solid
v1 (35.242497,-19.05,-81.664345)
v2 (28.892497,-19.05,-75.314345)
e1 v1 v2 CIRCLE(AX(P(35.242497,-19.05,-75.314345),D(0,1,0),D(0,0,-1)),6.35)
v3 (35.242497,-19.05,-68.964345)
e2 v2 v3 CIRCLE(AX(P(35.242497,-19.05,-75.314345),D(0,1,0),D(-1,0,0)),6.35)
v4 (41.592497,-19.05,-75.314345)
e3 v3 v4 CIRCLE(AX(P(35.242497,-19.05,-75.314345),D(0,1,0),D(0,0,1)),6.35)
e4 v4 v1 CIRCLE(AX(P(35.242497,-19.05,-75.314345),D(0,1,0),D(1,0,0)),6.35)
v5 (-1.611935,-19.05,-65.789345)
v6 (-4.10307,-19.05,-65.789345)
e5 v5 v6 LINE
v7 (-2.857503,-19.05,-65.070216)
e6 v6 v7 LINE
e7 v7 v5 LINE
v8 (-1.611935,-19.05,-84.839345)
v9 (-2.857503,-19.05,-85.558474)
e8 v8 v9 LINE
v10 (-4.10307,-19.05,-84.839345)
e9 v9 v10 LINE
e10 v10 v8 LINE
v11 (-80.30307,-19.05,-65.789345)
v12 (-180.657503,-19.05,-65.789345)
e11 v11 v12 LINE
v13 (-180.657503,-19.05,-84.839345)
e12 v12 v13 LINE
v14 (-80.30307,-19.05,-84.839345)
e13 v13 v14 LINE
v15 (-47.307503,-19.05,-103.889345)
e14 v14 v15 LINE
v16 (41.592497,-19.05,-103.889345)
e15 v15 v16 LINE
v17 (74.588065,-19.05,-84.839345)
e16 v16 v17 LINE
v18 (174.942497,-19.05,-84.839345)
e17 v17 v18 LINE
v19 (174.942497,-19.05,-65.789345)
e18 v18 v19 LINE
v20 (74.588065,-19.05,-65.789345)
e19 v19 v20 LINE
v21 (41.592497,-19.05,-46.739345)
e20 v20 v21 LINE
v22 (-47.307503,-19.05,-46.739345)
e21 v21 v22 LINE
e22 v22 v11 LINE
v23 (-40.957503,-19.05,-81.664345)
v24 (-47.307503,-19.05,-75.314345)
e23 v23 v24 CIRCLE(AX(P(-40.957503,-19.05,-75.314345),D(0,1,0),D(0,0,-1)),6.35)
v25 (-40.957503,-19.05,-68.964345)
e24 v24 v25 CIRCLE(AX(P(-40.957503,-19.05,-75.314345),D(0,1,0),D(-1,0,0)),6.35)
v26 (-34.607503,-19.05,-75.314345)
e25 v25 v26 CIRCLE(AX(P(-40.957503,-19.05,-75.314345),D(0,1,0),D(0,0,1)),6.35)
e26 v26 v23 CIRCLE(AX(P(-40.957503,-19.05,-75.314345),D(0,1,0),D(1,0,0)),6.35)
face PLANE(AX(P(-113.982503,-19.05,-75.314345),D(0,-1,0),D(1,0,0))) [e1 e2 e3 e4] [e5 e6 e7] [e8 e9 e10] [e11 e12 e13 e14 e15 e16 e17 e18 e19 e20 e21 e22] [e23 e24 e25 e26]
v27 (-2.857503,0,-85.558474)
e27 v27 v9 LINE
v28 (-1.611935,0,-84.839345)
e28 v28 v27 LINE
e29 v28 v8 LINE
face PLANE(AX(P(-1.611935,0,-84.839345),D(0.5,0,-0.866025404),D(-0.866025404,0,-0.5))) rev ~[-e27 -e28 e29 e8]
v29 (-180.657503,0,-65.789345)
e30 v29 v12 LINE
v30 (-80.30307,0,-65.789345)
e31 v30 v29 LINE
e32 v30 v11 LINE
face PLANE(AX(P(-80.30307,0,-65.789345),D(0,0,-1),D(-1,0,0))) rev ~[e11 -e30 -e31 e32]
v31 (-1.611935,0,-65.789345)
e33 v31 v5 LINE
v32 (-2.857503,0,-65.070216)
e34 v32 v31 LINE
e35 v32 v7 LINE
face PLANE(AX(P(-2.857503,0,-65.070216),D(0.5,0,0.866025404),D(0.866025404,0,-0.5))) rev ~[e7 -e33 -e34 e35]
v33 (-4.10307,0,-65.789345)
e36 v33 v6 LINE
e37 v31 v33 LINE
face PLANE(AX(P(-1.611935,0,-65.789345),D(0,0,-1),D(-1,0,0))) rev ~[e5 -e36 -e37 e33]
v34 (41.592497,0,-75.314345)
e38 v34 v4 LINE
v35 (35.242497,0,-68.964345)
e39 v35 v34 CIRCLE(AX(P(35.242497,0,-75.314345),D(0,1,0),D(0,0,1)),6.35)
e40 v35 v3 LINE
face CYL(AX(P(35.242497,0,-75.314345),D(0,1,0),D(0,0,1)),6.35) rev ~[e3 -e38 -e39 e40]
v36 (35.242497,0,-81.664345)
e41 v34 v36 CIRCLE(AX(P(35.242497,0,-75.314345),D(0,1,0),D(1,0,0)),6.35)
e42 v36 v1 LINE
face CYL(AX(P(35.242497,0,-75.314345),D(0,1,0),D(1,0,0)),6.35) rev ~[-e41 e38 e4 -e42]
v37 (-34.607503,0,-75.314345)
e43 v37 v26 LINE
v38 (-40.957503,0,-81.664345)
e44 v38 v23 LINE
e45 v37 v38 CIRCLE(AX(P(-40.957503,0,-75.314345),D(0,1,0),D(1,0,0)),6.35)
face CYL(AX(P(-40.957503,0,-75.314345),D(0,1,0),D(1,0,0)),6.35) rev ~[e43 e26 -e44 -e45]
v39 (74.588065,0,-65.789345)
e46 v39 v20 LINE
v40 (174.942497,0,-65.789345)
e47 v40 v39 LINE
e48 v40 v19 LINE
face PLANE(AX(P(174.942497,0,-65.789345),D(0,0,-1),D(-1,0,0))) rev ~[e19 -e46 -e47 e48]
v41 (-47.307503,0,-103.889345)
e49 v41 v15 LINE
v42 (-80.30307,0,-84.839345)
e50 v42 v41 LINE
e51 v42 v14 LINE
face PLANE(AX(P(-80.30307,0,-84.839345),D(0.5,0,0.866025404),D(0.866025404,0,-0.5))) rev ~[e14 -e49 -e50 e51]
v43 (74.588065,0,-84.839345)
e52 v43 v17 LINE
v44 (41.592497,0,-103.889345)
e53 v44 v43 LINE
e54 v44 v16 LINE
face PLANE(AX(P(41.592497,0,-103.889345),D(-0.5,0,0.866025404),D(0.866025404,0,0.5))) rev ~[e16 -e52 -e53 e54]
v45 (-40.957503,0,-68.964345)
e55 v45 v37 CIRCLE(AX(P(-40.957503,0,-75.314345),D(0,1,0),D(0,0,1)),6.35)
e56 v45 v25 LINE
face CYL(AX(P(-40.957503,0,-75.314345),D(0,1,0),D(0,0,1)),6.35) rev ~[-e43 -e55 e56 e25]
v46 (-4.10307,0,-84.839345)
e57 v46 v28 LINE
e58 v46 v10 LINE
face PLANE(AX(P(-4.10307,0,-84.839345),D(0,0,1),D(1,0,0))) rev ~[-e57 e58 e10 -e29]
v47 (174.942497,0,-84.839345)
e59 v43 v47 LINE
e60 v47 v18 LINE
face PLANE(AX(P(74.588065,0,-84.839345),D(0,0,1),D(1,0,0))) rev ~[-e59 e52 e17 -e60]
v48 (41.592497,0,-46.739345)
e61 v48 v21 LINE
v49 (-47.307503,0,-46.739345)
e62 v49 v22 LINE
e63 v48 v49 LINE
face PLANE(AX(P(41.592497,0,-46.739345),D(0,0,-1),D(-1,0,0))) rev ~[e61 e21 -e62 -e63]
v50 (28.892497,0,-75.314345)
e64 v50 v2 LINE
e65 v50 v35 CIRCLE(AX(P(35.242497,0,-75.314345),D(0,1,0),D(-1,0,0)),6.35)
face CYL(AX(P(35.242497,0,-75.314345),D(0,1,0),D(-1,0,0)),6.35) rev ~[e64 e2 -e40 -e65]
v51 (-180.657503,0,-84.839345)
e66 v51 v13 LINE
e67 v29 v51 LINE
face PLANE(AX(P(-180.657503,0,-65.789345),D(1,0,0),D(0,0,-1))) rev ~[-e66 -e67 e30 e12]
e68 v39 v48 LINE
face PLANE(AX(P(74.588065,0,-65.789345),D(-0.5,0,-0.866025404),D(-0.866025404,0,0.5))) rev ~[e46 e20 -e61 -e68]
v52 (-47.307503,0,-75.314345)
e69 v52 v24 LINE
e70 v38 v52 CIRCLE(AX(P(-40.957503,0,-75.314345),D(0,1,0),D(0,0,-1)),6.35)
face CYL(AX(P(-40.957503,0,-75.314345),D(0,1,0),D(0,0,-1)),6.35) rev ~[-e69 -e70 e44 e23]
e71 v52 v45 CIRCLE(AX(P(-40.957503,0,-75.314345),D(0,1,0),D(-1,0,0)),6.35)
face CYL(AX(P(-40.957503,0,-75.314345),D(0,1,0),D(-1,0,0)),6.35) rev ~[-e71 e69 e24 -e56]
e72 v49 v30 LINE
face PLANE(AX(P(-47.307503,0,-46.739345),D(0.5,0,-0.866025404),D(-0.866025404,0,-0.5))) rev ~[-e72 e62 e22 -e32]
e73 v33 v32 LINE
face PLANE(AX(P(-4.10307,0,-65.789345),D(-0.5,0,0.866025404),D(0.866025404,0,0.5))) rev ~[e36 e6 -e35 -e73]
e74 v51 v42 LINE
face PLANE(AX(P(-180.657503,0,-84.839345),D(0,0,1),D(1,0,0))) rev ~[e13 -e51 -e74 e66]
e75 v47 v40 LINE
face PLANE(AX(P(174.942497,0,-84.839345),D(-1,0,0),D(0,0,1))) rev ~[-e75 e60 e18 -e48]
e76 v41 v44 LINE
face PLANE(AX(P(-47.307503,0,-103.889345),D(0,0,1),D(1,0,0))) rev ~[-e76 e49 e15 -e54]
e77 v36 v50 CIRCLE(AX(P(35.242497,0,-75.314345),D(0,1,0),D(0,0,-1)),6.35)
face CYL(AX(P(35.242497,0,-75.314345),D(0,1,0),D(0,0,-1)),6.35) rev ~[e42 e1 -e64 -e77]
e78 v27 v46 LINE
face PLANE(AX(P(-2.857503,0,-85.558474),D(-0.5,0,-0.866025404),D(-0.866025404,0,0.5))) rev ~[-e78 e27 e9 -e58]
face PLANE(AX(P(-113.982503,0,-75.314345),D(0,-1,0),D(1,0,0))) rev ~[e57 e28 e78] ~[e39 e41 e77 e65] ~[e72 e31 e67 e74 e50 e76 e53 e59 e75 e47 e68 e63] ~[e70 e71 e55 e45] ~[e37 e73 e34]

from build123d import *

# Parameters (mm, degrees)
F1_DEPTH = 19.05


with BuildPart() as f1:
    # F0 (on Front) → F1 (new body)
    with BuildSketch(Plane.XZ):
        Polygon((-80.3030704341, -65.7893445744), (-180.6575025499, -65.7893445744), (-180.6575025499, -84.8393445744), (-80.3030704341, -84.8393445744), (-47.3075025499, -84.8393445744), (-47.3075025499, -75.3143445744), (-47.3075025499, -65.7893445744), align=None)
        Polygon((-47.3075025499, -46.7393445744), (-80.3030704341, -65.7893445744), (-47.3075025499, -65.7893445744), align=None)
        Polygon((-47.3075025499, -46.7393445744), (-47.3075025499, -65.7893445744), (-40.9575025499, -65.7893445744), (-34.6075025499, -65.7893445744), (-34.6075025499, -46.7393445744), align=None)
        with BuildLine():
            Line((-40.9575025499, -65.7893445744), (-47.3075025499, -65.7893445744))
            Line((-47.3075025499, -65.7893445744), (-47.3075025499, -75.3143445744))
            ThreePointArc((-47.3075025499, -75.3143445744), (-45.4476306104, -70.8242165139), (-40.9575025499, -68.9643445744))
            Line((-40.9575025499, -68.9643445744), (-40.9575025499, -65.7893445744))
        make_face()
        Polygon((-47.3075025499, -84.8393445744), (-80.3030704341, -84.8393445744), (-47.3075025499, -103.8893445744), align=None)
        with BuildLine():
            Line((-34.6075025499, -65.7893445744), (-40.9575025499, -65.7893445744))
            Line((-40.9575025499, -65.7893445744), (-40.9575025499, -68.9643445744))
            ThreePointArc((-40.9575025499, -68.9643445744), (-36.4673744894, -70.8242165139), (-34.6075025499, -75.3143445744))
            Line((-34.6075025499, -75.3143445744), (-34.6075025499, -65.7893445744))
        make_face()
        with BuildLine():
            ThreePointArc((-40.9575025499, -81.6643445744), (-45.4476306104, -79.8044726349), (-47.3075025499, -75.3143445744))
            Line((-47.3075025499, -75.3143445744), (-47.3075025499, -84.8393445744))
            Line((-47.3075025499, -84.8393445744), (-43.3831779935, -84.8393445744))
            Line((-43.3831779935, -84.8393445744), (-40.9575025499, -84.8393445744))
            Line((-40.9575025499, -84.8393445744), (-40.9575025499, -81.6643445744))
        make_face()
        Polygon((-2.8575025499, -65.0702156212), (-34.6075025499, -46.7393445744), (-34.6075025499, -65.7893445744), (-4.1030704341, -65.7893445744), align=None)
        Polygon((28.8924974501, -46.7393445744), (-34.6075025499, -46.7393445744), (-2.8575025499, -65.0702156212), align=None)
        Polygon((-43.3831779935, -84.8393445744), (-47.3075025499, -84.8393445744), (-47.3075025499, -103.8893445744), (-34.6075025499, -103.8893445744), (-34.6075025499, -84.8393445744), (-40.9575025499, -84.8393445744), align=None)
        Polygon((-4.1030704341, -65.7893445744), (-34.6075025499, -65.7893445744), (-34.6075025499, -75.3143445744), (-34.6075025499, -84.8393445744), (-4.1030704341, -84.8393445744), (-2.8575025499, -84.8393445744), (-2.8575025499, -65.7893445744), align=None)
        with BuildLine():
            ThreePointArc((-34.6075025499, -75.3143445744), (-36.4673744894, -79.8044726349), (-40.9575025499, -81.6643445744))
            Line((-40.9575025499, -81.6643445744), (-40.9575025499, -84.8393445744))
            Line((-40.9575025499, -84.8393445744), (-34.6075025499, -84.8393445744))
            Line((-34.6075025499, -84.8393445744), (-34.6075025499, -75.3143445744))
        make_face()
        Polygon((28.8924974501, -46.7393445744), (-2.8575025499, -65.0702156212), (-1.6119346657, -65.7893445744), (28.8924974501, -65.7893445744), align=None)
        Polygon((41.5924974501, -46.7393445744), (28.8924974501, -46.7393445744), (28.8924974501, -65.7893445744), (35.2424974501, -65.7893445744), (41.5924974501, -65.7893445744), align=None)
        Polygon((-34.6075025499, -84.8393445744), (-34.6075025499, -103.8893445744), (-2.8575025499, -85.5584735276), (-4.1030704341, -84.8393445744), align=None)
        Polygon((-2.8575025499, -85.5584735276), (-34.6075025499, -103.8893445744), (28.8924974501, -103.8893445744), align=None)
        Polygon((28.8924974501, -65.7893445744), (-1.6119346657, -65.7893445744), (-2.8575025499, -65.7893445744), (-2.8575025499, -84.8393445744), (-1.6119346657, -84.8393445744), (28.8924974501, -84.8393445744), (28.8924974501, -75.3143445744), align=None)
        Polygon((74.5880653343, -65.7893445744), (41.5924974501, -46.7393445744), (41.5924974501, -65.7893445744), align=None)
        with BuildLine():
            Line((35.2424974501, -65.7893445744), (28.8924974501, -65.7893445744))
            Line((28.8924974501, -65.7893445744), (28.8924974501, -75.3143445744))
            ThreePointArc((28.8924974501, -75.3143445744), (30.7523693896, -70.8242165139), (35.2424974501, -68.9643445744))
            Line((35.2424974501, -68.9643445744), (35.2424974501, -65.7893445744))
        make_face()
        Polygon((-1.6119346657, -84.8393445744), (-2.8575025499, -85.5584735276), (28.8924974501, -103.8893445744), (28.8924974501, -84.8393445744), align=None)
        Polygon((28.8924974501, -84.8393445744), (28.8924974501, -103.8893445744), (41.5924974501, -103.8893445744), (41.5924974501, -84.8393445744), (35.2424974501, -84.8393445744), align=None)
        with BuildLine():
            Line((41.5924974501, -75.3143445744), (41.5924974501, -65.7893445744))
            Line((41.5924974501, -65.7893445744), (35.2424974501, -65.7893445744))
            Line((35.2424974501, -65.7893445744), (35.2424974501, -68.9643445744))
            ThreePointArc((35.2424974501, -68.9643445744), (39.7326255106, -70.8242165139), (41.5924974501, -75.3143445744))
        make_face()
        Polygon((74.5880653343, -65.7893445744), (41.5924974501, -65.7893445744), (41.5924974501, -75.3143445744), (41.5924974501, -84.8393445744), (74.5880653343, -84.8393445744), (174.9424974501, -84.8393445744), (174.9424974501, -65.7893445744), align=None)
        with BuildLine():
            ThreePointArc((35.2424974501, -81.6643445744), (30.7523693896, -79.8044726349), (28.8924974501, -75.3143445744))
            Line((28.8924974501, -75.3143445744), (28.8924974501, -84.8393445744))
            Line((28.8924974501, -84.8393445744), (35.2424974501, -84.8393445744))
            Line((35.2424974501, -84.8393445744), (35.2424974501, -81.6643445744))
        make_face()
        Polygon((41.5924974501, -84.8393445744), (41.5924974501, -103.8893445744), (74.5880653343, -84.8393445744), align=None)
        with BuildLine():
            Line((41.5924974501, -84.8393445744), (41.5924974501, -75.3143445744))
            ThreePointArc((41.5924974501, -75.3143445744), (39.7326255106, -79.8044726349), (35.2424974501, -81.6643445744))
            Line((35.2424974501, -81.6643445744), (35.2424974501, -84.8393445744))
            Line((35.2424974501, -84.8393445744), (41.5924974501, -84.8393445744))
        make_face()
    extrude(amount=F1_DEPTH)


solid = f1.part
